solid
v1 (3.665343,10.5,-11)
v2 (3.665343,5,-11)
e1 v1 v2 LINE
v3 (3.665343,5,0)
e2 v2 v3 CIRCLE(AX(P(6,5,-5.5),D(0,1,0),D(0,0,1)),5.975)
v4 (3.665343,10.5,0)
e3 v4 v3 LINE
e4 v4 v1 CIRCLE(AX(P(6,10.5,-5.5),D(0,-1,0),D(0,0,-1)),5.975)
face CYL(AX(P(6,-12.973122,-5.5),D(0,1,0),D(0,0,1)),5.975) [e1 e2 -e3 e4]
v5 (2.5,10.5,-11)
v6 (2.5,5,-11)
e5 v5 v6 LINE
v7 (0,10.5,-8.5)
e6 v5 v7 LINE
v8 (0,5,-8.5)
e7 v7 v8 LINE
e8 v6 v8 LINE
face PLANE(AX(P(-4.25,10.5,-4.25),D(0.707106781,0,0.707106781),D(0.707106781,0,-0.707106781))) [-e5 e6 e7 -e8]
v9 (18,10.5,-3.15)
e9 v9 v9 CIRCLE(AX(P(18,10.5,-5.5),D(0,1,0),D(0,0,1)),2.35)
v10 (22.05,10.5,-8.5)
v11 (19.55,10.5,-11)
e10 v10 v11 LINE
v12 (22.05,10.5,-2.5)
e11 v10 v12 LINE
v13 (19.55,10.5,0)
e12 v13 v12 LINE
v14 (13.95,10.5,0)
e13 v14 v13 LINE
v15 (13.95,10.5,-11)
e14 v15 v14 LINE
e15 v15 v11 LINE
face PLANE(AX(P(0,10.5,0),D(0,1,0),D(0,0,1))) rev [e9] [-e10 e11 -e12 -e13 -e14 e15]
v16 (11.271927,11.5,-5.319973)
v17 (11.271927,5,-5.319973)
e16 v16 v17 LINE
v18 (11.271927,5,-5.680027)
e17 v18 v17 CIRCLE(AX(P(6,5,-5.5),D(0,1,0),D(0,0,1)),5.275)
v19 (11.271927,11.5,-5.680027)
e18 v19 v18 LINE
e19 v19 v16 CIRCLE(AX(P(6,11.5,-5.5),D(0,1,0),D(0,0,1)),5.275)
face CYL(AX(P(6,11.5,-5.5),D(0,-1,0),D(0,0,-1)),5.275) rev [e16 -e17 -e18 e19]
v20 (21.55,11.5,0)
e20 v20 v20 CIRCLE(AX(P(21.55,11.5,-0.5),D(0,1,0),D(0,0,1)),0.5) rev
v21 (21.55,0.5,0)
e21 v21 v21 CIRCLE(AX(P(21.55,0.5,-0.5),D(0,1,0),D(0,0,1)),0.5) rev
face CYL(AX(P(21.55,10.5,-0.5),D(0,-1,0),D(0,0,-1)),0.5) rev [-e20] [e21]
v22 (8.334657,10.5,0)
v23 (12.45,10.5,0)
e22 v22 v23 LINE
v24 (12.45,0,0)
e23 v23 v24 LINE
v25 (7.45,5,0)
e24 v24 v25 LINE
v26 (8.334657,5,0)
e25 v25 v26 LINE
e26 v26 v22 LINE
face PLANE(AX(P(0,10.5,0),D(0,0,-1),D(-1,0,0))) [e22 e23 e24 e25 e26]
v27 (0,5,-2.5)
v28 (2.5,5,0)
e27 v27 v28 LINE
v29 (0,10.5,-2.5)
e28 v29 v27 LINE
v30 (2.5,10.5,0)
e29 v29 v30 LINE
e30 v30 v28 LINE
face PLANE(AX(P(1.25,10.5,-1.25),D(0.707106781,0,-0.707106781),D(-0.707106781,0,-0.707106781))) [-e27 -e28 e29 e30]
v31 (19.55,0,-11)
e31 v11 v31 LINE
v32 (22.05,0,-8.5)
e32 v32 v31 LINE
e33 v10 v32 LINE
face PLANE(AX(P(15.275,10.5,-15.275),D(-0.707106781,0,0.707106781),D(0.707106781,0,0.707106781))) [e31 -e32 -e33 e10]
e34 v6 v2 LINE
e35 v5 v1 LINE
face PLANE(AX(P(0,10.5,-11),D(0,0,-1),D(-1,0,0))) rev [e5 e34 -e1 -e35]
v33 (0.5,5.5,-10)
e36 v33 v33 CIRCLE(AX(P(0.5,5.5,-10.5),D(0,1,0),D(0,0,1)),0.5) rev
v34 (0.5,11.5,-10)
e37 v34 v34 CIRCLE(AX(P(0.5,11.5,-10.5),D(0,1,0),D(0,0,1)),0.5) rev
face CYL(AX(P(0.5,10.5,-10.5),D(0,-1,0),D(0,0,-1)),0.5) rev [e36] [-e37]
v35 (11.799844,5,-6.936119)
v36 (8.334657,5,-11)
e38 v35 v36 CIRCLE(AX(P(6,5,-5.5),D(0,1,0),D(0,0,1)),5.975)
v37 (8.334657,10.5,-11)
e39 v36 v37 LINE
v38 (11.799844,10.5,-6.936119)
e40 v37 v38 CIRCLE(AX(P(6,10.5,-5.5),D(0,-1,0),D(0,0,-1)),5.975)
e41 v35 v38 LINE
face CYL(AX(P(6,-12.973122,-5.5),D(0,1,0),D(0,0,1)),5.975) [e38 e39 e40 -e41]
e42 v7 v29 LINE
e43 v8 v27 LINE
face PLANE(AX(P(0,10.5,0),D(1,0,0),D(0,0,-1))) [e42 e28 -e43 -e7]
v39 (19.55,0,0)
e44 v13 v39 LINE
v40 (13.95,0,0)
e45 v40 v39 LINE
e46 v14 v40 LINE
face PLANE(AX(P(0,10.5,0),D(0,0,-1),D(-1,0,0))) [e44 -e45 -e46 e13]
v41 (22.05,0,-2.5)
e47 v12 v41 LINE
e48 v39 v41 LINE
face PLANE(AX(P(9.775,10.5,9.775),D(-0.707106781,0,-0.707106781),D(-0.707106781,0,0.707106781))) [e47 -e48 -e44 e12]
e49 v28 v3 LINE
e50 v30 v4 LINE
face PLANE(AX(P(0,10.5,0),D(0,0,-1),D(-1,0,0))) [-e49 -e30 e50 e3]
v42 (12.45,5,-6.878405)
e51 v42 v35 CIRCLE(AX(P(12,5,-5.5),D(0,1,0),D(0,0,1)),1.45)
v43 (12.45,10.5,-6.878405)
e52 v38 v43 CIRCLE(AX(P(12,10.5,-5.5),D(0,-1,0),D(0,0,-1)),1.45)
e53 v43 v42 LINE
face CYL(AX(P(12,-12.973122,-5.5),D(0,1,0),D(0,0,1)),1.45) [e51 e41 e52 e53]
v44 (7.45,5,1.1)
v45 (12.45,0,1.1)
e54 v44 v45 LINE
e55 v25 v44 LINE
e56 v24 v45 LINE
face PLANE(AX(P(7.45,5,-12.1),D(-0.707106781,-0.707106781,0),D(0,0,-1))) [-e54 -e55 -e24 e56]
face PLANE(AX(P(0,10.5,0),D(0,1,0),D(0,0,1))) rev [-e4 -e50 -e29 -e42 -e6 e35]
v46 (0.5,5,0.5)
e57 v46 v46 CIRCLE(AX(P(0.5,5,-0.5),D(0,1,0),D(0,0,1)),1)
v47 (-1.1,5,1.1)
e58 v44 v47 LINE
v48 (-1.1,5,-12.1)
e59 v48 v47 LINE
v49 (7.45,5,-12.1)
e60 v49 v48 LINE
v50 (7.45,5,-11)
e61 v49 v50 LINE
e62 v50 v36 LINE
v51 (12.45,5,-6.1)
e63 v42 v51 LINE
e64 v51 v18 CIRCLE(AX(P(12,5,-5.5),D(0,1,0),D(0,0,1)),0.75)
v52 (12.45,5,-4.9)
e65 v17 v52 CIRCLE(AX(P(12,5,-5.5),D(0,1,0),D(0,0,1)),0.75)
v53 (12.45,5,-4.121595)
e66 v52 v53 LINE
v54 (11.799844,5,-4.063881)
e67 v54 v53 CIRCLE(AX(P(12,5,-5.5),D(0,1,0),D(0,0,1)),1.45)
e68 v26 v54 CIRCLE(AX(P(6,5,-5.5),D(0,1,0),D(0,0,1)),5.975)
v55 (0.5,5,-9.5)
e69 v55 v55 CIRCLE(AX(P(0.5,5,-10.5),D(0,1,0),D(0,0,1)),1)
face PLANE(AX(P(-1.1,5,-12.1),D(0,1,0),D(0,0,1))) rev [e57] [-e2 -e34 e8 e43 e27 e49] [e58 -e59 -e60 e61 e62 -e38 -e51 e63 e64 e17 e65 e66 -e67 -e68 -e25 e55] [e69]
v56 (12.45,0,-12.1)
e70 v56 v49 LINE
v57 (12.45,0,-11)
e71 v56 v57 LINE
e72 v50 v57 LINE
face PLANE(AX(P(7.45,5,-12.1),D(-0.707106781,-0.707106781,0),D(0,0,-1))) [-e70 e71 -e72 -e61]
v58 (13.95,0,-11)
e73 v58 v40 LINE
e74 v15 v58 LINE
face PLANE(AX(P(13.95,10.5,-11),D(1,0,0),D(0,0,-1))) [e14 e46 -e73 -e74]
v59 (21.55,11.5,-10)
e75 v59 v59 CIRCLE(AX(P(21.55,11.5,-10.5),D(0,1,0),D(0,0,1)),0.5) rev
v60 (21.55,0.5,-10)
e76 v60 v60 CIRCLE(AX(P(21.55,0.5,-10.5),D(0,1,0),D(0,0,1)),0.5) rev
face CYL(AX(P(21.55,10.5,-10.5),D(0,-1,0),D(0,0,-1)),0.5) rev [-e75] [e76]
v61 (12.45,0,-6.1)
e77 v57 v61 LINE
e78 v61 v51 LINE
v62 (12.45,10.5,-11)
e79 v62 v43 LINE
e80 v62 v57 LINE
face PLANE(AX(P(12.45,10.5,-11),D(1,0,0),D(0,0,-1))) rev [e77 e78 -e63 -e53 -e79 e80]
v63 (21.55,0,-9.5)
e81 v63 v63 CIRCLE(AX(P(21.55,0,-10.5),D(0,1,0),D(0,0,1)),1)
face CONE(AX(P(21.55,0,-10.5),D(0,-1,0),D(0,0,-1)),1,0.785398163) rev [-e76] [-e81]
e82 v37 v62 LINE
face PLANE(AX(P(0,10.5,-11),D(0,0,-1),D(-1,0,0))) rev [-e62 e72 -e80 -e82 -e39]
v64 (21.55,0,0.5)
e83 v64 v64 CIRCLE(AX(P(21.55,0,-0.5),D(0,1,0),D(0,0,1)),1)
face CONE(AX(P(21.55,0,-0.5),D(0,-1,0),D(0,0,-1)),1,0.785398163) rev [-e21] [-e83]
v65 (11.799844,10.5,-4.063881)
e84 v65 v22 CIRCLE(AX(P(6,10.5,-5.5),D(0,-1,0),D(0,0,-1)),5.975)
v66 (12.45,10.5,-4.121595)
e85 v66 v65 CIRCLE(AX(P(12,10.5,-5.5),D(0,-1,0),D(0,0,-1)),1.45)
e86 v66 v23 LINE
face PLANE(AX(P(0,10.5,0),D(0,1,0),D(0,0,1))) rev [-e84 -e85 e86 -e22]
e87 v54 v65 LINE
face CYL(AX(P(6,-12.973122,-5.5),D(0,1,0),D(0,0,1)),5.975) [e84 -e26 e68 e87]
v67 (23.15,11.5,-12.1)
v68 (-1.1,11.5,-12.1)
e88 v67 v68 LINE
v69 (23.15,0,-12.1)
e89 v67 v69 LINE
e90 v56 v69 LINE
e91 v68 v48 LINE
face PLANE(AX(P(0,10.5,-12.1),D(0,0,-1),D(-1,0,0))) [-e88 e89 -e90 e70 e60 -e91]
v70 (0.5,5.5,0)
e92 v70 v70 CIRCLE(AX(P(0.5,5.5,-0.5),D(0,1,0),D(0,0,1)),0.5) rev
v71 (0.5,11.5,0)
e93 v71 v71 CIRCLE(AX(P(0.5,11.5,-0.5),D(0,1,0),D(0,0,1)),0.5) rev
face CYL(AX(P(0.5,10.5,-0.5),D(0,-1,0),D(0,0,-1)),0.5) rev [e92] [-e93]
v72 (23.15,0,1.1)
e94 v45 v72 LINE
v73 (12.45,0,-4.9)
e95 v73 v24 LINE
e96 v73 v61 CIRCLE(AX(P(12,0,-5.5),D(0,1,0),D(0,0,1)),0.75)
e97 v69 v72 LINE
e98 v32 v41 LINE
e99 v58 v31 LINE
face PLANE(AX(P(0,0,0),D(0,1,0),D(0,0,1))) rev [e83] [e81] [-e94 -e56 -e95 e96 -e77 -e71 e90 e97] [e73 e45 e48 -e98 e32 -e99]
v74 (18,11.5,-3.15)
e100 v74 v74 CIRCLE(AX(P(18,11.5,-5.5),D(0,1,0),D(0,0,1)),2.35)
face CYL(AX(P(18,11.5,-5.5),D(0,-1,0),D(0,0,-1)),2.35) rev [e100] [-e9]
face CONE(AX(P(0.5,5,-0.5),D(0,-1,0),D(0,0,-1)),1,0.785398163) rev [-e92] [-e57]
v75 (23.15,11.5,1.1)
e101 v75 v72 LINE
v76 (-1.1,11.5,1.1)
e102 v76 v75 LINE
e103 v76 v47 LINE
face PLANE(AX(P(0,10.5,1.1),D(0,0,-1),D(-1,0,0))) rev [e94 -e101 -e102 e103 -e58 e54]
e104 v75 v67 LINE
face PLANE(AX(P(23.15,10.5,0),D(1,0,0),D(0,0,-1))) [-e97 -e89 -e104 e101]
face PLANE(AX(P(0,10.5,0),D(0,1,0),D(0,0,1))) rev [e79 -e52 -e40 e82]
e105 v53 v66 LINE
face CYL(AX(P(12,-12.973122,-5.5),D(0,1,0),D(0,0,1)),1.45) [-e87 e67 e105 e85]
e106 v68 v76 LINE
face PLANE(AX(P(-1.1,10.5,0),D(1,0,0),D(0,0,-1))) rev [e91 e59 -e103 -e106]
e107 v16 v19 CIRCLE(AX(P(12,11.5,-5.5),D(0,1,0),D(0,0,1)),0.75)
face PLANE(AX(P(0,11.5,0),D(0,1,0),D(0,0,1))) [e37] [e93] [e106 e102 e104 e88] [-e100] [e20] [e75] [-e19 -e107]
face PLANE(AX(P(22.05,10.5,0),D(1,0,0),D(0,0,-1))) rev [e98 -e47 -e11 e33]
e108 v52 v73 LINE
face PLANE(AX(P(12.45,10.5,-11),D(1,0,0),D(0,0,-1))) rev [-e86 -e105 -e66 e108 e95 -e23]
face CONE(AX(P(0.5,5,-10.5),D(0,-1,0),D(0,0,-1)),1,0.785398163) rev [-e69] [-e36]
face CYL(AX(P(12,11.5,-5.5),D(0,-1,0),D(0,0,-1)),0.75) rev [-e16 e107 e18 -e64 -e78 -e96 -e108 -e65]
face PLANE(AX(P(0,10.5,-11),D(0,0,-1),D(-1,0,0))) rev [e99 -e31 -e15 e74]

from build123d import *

# Parameters (mm, degrees)
ESQUISSE2_W             = 24.25
ESQUISSE2_H             = 13.2
ESQUISSE2_R             = 0.5
BOSS_EXTRU_1_DEPTH      = 10.5
ESQUISSE3_W             = 24.25
ESQUISSE3_H             = 13.2
ESQUISSE3_R             = 0.5
ESQUISSE3_R_2           = 2.35
BOSS_EXTRU_2_DEPTH      = 1
ESQUISSE4_W             = 13.55
ESQUISSE4_H             = 5
ENL_V_MAT_EXTRU_1_DEPTH = 30.024343231
CHANFREIN1_SIZE         = 5
BOSS_EXTRU_3_START      = 5.5
BOSS_EXTRU_3_DEPTH      = 5.5
ESQUISSE6_R             = 0.75
ENL_V_MAT_EXTRU_2_DEPTH = 29.540891717
CHANFREIN2_SIZE         = 0.5


with BuildPart() as part:
    # Esquisse2 → Boss.-Extru.1 (new body)
    with BuildSketch(Plane(origin=(0, 0, 0), x_dir=(1, 0, 0), z_dir=(0, 1, 0))):
        with Locations((11.025, 5.5)):
            Rectangle(ESQUISSE2_W, ESQUISSE2_H)
        Polygon((0, 8.5), (2.5, 11), (12.45, 11), (12.45, 0), (2.5, 0), (0, 2.5), align=None, mode=Mode.SUBTRACT)
        with Locations(Location((0.5, 10.5, 0), (0, 0, 270))):
            Circle(ESQUISSE2_R, mode=Mode.SUBTRACT)
        Polygon((19.55, 0), (13.95, 0), (13.95, 11), (19.55, 11), (22.05, 8.5), (22.05, 2.5), align=None, mode=Mode.SUBTRACT)
        with Locations(Location((0.5, 0.5, 0), (0, 0, 270))):
            Circle(ESQUISSE2_R, mode=Mode.SUBTRACT)
        with Locations(Location((21.55, 0.5, 0), (0, 0, 270))):
            Circle(ESQUISSE2_R, mode=Mode.SUBTRACT)
        with Locations(Location((21.55, 10.5, 0), (0, 0, 270))):
            Circle(ESQUISSE2_R, mode=Mode.SUBTRACT)
    extrude(amount=BOSS_EXTRU_1_DEPTH)

    # Esquisse3 → Boss.-Extru.2 (add)
    with BuildSketch(Plane(origin=(0, 10.5, 0), x_dir=(1, 0, 0), z_dir=(0, 1, 0))):
        with Locations((11.025, 5.5)):
            Rectangle(ESQUISSE3_W, ESQUISSE3_H)
        with Locations(Location((0.5, 0.5, 0), (0, 0, 270))):
            Circle(ESQUISSE3_R, mode=Mode.SUBTRACT)
        with Locations(Location((21.55, 0.5, 0), (0, 0, 270))):
            Circle(ESQUISSE3_R, mode=Mode.SUBTRACT)
        with BuildLine():
            ThreePointArc((11.271927083, 5.319972702), (0.725, 5.5), (11.271927083, 5.680027298))
            ThreePointArc((11.271927083, 5.680027298), (12.090678863, 6.244498048), (12.75, 5.5))
            ThreePointArc((12.75, 5.5), (12.090678863, 4.755501952), (11.271927083, 5.319972702))
        make_face(mode=Mode.SUBTRACT)
        with Locations(Location((0.5, 10.5, 0), (0, 0, 270))):
            Circle(ESQUISSE3_R, mode=Mode.SUBTRACT)
        with Locations(Location((18, 5.5, 0), (0, 0, 270))):
            Circle(ESQUISSE3_R_2, mode=Mode.SUBTRACT)
        with Locations(Location((21.55, 10.5, 0), (0, 0, 270))):
            Circle(ESQUISSE3_R, mode=Mode.SUBTRACT)
    extrude(amount=BOSS_EXTRU_2_DEPTH)

    # Esquisse4 → Enlèv. mat.-Extru.1 (cut, through all)
    with BuildSketch(Plane.XY.offset(1.1)):
        with Locations((5.675, 2.5)):
            Rectangle(ESQUISSE4_W, ESQUISSE4_H)
    extrude(amount=-ENL_V_MAT_EXTRU_1_DEPTH, mode=Mode.SUBTRACT)

    # Chanfrein1
    chanfrein1_edges = [part.edges().sort_by_distance(p)[0] for p in [
        (12.45, 5, -11.55),
        (12.45, 5, 0.55),
    ]]
    chamfer(chanfrein1_edges, length=CHANFREIN1_SIZE - 0.0001)  # a hair under: the kernel refuses the full size

    # Esquisse5 → Boss.-Extru.3 (add)
    with BuildSketch(Plane.XZ.offset(-10.5).offset(BOSS_EXTRU_3_START)):
        with BuildLine():
            ThreePointArc((11.79984375, -6.936118893), (13.45, -5.5), (11.79984375, -4.063881107))
            ThreePointArc((11.79984375, -4.063881107), (0.025, -5.5), (11.79984375, -6.936118893))
        make_face()
        with BuildLine():
            ThreePointArc((11.271927083, -5.319972702), (0.725, -5.5), (11.271927083, -5.680027298))
            ThreePointArc((11.271927083, -5.680027298), (12.75, -5.5), (11.271927083, -5.319972702))
        make_face(mode=Mode.SUBTRACT)
    extrude(amount=-BOSS_EXTRU_3_DEPTH)

    # Esquisse6 → Enlèv. mat.-Extru.2 (cut, through all)
    with BuildSketch(Plane(origin=(0, 11.5, 0), x_dir=(1, 0, 0), z_dir=(0, 1, 0))):
        with Locations((12, 5.5)):
            Circle(ESQUISSE6_R)
    extrude(amount=-ENL_V_MAT_EXTRU_2_DEPTH, mode=Mode.SUBTRACT)

    # Chanfrein2
    chanfrein2_edges = [part.edges().sort_by_distance(p)[0] for p in [
        (0.5, 5, -1),
        (0.5, 5, -11),
        (21.55, 0, -1),
        (21.55, 0, -11),
    ]]
    chamfer(chanfrein2_edges, length=CHANFREIN2_SIZE)


solid = part.part
